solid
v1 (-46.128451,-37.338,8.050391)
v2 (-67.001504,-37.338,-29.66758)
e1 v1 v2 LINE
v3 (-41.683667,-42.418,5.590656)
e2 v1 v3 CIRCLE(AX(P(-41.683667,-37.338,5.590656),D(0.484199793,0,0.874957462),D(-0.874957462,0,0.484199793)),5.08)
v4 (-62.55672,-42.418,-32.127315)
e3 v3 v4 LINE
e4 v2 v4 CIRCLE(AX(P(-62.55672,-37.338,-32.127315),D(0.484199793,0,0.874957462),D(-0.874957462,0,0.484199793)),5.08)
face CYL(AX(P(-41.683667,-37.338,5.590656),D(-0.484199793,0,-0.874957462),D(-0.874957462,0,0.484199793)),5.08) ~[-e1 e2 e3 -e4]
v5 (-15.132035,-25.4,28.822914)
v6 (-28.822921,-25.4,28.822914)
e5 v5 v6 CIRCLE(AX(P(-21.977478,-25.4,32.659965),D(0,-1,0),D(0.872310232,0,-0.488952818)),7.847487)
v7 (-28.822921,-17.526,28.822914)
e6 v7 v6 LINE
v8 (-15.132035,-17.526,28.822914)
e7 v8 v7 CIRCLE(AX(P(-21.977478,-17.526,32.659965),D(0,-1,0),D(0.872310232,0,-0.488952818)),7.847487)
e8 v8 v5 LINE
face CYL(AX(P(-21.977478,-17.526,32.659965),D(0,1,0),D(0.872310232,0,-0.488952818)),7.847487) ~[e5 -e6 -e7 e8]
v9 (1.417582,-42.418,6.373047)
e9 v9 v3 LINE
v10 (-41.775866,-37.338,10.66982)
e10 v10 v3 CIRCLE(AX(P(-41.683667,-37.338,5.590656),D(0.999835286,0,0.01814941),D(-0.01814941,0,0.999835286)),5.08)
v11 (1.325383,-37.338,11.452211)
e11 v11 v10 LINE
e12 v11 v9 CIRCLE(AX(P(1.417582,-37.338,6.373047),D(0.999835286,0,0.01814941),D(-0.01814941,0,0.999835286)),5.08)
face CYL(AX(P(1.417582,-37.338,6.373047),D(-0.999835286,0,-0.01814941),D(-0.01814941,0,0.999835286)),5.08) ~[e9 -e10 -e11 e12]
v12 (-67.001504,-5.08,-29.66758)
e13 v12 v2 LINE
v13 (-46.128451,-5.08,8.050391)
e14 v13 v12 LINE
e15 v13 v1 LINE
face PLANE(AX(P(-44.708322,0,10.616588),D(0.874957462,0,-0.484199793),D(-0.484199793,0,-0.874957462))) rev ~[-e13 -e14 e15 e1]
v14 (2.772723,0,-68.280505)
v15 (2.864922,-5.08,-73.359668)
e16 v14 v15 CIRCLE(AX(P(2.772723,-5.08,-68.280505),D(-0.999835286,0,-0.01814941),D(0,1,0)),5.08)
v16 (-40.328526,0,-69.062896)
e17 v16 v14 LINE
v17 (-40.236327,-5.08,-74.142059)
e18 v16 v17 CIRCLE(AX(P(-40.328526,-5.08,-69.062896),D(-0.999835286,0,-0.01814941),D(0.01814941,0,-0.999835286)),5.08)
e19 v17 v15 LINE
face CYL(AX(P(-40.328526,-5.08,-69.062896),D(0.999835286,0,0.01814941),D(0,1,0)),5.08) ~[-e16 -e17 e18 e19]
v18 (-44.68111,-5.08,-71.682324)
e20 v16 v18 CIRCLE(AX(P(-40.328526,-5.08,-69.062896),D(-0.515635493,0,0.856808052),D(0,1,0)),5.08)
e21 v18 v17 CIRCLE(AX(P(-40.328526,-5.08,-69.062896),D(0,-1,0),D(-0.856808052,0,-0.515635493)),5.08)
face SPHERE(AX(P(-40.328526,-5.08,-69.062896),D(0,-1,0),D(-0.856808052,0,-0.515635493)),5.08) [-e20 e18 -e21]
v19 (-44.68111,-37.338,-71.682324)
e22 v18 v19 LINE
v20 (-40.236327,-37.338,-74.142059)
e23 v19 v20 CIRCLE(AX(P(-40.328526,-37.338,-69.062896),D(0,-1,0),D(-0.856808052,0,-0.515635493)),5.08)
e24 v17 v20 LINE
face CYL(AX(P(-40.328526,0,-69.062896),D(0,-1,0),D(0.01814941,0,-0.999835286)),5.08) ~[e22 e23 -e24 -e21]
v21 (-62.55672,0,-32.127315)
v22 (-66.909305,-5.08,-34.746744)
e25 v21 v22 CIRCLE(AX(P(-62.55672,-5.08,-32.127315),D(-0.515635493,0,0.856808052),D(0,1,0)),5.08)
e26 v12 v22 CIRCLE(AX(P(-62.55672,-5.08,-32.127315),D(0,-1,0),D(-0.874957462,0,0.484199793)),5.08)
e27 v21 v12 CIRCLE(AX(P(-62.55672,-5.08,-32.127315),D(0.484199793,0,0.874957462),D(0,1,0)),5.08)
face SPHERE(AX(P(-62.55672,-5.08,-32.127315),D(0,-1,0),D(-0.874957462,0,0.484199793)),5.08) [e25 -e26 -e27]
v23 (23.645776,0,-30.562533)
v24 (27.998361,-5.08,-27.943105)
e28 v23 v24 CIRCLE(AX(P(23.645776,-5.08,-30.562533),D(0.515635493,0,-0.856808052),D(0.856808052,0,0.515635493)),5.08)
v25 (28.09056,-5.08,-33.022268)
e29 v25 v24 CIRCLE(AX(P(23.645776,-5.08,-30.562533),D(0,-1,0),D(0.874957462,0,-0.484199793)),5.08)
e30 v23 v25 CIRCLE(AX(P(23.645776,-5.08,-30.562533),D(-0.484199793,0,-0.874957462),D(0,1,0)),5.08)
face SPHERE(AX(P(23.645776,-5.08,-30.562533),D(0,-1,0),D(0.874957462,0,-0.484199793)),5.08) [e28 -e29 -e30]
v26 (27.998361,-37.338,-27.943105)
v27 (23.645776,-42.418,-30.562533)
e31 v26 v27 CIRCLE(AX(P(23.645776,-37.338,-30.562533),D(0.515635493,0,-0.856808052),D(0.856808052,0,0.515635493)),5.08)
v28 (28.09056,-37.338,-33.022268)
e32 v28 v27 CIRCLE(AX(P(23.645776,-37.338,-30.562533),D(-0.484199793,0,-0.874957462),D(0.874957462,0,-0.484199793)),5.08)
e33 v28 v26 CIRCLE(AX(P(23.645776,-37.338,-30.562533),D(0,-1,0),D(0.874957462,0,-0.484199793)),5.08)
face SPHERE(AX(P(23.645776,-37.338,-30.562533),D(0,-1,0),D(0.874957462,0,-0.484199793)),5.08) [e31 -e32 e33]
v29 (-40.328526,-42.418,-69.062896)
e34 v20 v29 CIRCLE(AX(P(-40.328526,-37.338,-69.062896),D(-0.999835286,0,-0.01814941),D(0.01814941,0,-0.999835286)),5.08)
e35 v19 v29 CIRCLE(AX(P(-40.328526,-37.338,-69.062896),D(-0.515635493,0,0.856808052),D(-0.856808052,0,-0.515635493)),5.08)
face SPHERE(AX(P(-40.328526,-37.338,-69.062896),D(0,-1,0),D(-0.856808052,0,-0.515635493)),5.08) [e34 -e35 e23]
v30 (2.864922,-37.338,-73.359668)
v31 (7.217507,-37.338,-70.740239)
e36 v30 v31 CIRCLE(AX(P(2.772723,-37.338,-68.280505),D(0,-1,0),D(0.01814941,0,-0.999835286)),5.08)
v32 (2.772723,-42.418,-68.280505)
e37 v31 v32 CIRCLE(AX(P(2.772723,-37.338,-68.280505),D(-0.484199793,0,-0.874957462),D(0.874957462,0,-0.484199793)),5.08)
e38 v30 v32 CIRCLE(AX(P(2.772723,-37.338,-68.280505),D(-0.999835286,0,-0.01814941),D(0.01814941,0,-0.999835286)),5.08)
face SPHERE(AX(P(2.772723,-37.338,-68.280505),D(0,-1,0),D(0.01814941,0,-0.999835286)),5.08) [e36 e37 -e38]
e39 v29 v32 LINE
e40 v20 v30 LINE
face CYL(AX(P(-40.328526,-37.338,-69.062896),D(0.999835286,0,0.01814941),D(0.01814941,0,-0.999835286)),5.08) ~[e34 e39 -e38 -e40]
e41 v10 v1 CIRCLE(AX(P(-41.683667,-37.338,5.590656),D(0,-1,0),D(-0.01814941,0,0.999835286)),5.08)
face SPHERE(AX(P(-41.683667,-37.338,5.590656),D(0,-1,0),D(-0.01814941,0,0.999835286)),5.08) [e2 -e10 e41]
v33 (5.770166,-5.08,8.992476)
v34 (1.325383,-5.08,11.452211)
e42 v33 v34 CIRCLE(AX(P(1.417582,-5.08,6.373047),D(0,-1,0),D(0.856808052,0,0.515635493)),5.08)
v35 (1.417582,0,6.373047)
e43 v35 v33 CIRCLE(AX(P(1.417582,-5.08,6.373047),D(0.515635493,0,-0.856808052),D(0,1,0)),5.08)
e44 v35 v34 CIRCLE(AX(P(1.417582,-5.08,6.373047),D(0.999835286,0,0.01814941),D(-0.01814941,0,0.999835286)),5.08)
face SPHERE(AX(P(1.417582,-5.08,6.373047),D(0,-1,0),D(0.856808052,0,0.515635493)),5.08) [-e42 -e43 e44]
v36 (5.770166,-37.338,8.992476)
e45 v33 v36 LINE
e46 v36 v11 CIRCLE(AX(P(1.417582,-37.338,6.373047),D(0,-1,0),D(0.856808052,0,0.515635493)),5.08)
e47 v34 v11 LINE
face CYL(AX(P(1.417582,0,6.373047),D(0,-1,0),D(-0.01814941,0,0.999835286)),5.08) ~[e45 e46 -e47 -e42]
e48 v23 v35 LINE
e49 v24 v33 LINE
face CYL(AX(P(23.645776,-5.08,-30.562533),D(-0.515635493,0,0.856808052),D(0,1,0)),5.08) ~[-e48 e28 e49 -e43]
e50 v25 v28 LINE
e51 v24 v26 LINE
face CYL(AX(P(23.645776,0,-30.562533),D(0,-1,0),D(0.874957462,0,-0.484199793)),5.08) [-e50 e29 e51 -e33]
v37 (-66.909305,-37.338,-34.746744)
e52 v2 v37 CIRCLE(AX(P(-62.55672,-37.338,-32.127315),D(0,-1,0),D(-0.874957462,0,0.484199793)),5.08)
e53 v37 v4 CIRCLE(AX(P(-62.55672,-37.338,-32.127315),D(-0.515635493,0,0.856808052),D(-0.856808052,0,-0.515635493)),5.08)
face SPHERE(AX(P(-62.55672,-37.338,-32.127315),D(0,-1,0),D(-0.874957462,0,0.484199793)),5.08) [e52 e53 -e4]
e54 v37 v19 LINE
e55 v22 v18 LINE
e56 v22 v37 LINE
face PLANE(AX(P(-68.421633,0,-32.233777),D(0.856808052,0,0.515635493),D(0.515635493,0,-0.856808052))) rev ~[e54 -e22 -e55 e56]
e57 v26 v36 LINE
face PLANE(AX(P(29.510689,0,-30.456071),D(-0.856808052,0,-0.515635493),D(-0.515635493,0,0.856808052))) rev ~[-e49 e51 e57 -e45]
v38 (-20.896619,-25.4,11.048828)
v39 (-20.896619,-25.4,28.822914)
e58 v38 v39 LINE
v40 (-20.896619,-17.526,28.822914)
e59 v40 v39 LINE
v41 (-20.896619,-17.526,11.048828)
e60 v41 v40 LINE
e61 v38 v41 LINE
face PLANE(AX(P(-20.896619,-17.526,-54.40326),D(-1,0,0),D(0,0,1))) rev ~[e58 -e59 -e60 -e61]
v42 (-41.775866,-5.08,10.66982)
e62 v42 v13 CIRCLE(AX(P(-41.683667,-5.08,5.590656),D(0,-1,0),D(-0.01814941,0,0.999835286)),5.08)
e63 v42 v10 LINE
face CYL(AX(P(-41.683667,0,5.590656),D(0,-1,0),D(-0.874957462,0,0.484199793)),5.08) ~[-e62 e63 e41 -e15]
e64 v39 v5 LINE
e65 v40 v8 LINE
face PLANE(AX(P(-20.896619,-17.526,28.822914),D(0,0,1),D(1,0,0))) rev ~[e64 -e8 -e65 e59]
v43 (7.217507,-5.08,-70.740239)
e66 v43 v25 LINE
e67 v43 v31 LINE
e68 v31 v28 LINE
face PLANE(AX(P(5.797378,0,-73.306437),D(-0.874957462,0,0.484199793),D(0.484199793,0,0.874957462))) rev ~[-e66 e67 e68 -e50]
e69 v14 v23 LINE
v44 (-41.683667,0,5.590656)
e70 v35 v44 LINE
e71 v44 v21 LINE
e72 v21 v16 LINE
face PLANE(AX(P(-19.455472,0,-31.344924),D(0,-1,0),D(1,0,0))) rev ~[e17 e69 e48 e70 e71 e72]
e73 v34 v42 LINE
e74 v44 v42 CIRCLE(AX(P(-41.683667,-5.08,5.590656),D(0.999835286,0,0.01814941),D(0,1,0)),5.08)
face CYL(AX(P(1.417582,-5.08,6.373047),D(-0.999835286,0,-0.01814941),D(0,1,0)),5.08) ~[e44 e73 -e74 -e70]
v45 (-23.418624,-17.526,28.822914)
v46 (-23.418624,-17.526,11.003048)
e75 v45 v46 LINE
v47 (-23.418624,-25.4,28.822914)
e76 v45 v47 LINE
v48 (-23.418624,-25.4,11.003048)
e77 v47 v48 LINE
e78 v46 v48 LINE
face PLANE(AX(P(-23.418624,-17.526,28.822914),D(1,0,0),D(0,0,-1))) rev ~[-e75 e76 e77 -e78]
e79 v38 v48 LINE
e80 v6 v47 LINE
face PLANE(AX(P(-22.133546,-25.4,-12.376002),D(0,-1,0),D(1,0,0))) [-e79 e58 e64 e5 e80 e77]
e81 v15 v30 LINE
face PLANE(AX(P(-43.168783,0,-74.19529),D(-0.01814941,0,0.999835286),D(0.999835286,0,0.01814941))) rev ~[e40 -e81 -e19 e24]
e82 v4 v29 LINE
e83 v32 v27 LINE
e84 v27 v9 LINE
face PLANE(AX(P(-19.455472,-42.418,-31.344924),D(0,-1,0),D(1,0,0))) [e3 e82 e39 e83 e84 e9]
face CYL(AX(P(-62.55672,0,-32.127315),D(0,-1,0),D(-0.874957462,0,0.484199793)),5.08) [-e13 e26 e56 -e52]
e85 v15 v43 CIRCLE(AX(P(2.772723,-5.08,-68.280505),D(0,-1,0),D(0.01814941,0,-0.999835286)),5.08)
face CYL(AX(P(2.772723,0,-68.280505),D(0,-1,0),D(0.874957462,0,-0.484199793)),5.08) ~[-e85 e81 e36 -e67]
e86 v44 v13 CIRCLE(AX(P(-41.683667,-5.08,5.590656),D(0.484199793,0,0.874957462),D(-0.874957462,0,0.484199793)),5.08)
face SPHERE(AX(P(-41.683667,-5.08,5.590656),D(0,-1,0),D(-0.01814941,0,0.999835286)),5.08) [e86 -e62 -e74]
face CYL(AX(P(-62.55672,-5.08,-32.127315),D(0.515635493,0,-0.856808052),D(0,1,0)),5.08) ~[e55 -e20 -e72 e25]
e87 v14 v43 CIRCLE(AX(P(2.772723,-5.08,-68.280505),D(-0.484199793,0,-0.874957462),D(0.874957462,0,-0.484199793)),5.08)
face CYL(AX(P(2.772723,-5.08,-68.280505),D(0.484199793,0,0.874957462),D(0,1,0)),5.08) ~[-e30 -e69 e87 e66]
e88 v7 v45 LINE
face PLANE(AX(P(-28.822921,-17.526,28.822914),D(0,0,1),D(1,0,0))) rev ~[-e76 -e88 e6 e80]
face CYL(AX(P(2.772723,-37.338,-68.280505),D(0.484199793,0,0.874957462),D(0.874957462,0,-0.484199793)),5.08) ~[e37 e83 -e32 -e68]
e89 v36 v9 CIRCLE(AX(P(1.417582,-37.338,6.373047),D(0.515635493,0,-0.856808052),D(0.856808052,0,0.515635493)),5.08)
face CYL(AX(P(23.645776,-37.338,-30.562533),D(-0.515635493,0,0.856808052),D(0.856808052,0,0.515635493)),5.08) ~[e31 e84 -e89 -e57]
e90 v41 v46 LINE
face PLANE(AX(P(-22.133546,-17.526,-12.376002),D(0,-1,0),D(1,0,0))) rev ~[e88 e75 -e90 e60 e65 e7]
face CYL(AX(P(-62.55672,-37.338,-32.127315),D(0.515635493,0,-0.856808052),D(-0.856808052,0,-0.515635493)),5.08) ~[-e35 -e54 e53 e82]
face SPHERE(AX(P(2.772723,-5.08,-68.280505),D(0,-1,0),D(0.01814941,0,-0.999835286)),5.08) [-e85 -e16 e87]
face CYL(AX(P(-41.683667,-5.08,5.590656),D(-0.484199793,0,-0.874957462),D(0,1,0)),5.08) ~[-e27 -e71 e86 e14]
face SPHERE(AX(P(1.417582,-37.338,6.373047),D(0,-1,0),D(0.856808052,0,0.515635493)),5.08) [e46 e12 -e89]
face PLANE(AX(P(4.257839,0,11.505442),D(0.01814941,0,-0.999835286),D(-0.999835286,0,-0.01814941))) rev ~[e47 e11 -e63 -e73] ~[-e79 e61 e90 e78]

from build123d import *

# Parameters (mm, degrees)
F1_DEPTH = 42.418
F3_START = 17.526
F3_DEPTH = 7.874
F4_F1_R  = 5.08
F4_F2_R  = 5.08
F4_F3_R  = 5.08
F4_F4_R  = 5.08
F4_F5_R  = 5.08
F4_F6_R  = 5.08
F4_F7_R  = 5.08
F4_F8_R  = 5.08


# Not quite as in the source:
# - a feature of the source that left no trace in its solid (it failed there, or was rolled back) is left out


with BuildPart() as f1:
    # F0 (on Front) → F1 (new body)
    with BuildSketch(Plane.XZ):
        Polygon((5.7973779566, -73.3064366429), (29.5106887989, -30.4560707957), (4.2578388349, 11.5054417251), (-44.7083219714, 10.6165883988), (-68.4216328137, -32.2337774485), (-43.1687828497, -74.1952899693), align=None)
    extrude(amount=F1_DEPTH)

    # F2 (on Front) → F3 (join)
    with BuildSketch(Plane.XZ.offset(F3_START)):
        Polygon((-23.4186239541, 28.8229137659), (-23.4186239541, 23.4186165035), (-23.4186239541, -51.1606782675), (-20.8966191858, -54.4032603502), (-20.8966191858, 28.8229137659), align=None)
        with BuildLine():
            Line((-28.8229212165, 28.8229137659), (-23.4186239541, 28.8229137659))
            Line((-23.4186239541, 28.8229137659), (-20.8966191858, 28.8229137659))
            Line((-20.8966191858, 28.8229137659), (-15.1320351288, 28.8229137659))
            ThreePointArc((-15.1320351288, 28.8229137659), (-21.9774781726, 40.5074513695), (-28.8229212165, 28.8229137659))
        make_face()
    extrude(amount=F3_DEPTH)

    # F4: fillet of radius 5.08 on 14 edges, made by hand

    # F4_f1
    f4_f1_edges = [f1.edges().sort_by_distance(p)[0] for p in [
        (5.7973779566, -21.209, -73.3064366429),
    ]]
    fillet(f4_f1_edges, radius=F4_F1_R)

    # F4_f2
    f4_f2_edges = [f1.edges().sort_by_distance(p)[0] for p in [
        (29.5106887989, -21.209, -30.4560707957),
    ]]
    fillet(f4_f2_edges, radius=F4_F2_R)

    # F4_f3
    f4_f3_edges = [f1.edges().sort_by_distance(p)[0] for p in [
        (-43.1687828497, -21.209, -74.1952899693),
    ]]
    fillet(f4_f3_edges, radius=F4_F3_R)

    # F4_f4
    f4_f4_edges = [f1.edges().sort_by_distance(p)[0] for p in [
        (4.2578388349, -21.209, 11.5054417251),
    ]]
    fillet(f4_f4_edges, radius=F4_F4_R)

    # F4_f5
    f4_f5_edges = [f1.edges().sort_by_distance(p)[0] for p in [
        (-68.4216328137, -21.209, -32.2337774485),
    ]]
    fillet(f4_f5_edges, radius=F4_F5_R)

    # F4_f6
    f4_f6_edges = [f1.edges().sort_by_distance(p)[0] for p in [
        (-44.7083219714, -21.209, 10.6165883988),
    ]]
    fillet(f4_f6_edges, radius=F4_F6_R)

    # F4_f7
    f4_f7_edges = [f1.edges().sort_by_distance(p)[0] for p in [
        (-55.7952078317, 0, -53.2145337089),
    ]]
    fillet(f4_f7_edges, radius=F4_F7_R)

    # F4_f8
    f4_f8_edges = [f1.edges().sort_by_distance(p)[0] for p in [
        (-55.7952078317, -42.418, -53.2145337089),
    ]]
    fillet(f4_f8_edges, radius=F4_F8_R)


solid = f1.part
